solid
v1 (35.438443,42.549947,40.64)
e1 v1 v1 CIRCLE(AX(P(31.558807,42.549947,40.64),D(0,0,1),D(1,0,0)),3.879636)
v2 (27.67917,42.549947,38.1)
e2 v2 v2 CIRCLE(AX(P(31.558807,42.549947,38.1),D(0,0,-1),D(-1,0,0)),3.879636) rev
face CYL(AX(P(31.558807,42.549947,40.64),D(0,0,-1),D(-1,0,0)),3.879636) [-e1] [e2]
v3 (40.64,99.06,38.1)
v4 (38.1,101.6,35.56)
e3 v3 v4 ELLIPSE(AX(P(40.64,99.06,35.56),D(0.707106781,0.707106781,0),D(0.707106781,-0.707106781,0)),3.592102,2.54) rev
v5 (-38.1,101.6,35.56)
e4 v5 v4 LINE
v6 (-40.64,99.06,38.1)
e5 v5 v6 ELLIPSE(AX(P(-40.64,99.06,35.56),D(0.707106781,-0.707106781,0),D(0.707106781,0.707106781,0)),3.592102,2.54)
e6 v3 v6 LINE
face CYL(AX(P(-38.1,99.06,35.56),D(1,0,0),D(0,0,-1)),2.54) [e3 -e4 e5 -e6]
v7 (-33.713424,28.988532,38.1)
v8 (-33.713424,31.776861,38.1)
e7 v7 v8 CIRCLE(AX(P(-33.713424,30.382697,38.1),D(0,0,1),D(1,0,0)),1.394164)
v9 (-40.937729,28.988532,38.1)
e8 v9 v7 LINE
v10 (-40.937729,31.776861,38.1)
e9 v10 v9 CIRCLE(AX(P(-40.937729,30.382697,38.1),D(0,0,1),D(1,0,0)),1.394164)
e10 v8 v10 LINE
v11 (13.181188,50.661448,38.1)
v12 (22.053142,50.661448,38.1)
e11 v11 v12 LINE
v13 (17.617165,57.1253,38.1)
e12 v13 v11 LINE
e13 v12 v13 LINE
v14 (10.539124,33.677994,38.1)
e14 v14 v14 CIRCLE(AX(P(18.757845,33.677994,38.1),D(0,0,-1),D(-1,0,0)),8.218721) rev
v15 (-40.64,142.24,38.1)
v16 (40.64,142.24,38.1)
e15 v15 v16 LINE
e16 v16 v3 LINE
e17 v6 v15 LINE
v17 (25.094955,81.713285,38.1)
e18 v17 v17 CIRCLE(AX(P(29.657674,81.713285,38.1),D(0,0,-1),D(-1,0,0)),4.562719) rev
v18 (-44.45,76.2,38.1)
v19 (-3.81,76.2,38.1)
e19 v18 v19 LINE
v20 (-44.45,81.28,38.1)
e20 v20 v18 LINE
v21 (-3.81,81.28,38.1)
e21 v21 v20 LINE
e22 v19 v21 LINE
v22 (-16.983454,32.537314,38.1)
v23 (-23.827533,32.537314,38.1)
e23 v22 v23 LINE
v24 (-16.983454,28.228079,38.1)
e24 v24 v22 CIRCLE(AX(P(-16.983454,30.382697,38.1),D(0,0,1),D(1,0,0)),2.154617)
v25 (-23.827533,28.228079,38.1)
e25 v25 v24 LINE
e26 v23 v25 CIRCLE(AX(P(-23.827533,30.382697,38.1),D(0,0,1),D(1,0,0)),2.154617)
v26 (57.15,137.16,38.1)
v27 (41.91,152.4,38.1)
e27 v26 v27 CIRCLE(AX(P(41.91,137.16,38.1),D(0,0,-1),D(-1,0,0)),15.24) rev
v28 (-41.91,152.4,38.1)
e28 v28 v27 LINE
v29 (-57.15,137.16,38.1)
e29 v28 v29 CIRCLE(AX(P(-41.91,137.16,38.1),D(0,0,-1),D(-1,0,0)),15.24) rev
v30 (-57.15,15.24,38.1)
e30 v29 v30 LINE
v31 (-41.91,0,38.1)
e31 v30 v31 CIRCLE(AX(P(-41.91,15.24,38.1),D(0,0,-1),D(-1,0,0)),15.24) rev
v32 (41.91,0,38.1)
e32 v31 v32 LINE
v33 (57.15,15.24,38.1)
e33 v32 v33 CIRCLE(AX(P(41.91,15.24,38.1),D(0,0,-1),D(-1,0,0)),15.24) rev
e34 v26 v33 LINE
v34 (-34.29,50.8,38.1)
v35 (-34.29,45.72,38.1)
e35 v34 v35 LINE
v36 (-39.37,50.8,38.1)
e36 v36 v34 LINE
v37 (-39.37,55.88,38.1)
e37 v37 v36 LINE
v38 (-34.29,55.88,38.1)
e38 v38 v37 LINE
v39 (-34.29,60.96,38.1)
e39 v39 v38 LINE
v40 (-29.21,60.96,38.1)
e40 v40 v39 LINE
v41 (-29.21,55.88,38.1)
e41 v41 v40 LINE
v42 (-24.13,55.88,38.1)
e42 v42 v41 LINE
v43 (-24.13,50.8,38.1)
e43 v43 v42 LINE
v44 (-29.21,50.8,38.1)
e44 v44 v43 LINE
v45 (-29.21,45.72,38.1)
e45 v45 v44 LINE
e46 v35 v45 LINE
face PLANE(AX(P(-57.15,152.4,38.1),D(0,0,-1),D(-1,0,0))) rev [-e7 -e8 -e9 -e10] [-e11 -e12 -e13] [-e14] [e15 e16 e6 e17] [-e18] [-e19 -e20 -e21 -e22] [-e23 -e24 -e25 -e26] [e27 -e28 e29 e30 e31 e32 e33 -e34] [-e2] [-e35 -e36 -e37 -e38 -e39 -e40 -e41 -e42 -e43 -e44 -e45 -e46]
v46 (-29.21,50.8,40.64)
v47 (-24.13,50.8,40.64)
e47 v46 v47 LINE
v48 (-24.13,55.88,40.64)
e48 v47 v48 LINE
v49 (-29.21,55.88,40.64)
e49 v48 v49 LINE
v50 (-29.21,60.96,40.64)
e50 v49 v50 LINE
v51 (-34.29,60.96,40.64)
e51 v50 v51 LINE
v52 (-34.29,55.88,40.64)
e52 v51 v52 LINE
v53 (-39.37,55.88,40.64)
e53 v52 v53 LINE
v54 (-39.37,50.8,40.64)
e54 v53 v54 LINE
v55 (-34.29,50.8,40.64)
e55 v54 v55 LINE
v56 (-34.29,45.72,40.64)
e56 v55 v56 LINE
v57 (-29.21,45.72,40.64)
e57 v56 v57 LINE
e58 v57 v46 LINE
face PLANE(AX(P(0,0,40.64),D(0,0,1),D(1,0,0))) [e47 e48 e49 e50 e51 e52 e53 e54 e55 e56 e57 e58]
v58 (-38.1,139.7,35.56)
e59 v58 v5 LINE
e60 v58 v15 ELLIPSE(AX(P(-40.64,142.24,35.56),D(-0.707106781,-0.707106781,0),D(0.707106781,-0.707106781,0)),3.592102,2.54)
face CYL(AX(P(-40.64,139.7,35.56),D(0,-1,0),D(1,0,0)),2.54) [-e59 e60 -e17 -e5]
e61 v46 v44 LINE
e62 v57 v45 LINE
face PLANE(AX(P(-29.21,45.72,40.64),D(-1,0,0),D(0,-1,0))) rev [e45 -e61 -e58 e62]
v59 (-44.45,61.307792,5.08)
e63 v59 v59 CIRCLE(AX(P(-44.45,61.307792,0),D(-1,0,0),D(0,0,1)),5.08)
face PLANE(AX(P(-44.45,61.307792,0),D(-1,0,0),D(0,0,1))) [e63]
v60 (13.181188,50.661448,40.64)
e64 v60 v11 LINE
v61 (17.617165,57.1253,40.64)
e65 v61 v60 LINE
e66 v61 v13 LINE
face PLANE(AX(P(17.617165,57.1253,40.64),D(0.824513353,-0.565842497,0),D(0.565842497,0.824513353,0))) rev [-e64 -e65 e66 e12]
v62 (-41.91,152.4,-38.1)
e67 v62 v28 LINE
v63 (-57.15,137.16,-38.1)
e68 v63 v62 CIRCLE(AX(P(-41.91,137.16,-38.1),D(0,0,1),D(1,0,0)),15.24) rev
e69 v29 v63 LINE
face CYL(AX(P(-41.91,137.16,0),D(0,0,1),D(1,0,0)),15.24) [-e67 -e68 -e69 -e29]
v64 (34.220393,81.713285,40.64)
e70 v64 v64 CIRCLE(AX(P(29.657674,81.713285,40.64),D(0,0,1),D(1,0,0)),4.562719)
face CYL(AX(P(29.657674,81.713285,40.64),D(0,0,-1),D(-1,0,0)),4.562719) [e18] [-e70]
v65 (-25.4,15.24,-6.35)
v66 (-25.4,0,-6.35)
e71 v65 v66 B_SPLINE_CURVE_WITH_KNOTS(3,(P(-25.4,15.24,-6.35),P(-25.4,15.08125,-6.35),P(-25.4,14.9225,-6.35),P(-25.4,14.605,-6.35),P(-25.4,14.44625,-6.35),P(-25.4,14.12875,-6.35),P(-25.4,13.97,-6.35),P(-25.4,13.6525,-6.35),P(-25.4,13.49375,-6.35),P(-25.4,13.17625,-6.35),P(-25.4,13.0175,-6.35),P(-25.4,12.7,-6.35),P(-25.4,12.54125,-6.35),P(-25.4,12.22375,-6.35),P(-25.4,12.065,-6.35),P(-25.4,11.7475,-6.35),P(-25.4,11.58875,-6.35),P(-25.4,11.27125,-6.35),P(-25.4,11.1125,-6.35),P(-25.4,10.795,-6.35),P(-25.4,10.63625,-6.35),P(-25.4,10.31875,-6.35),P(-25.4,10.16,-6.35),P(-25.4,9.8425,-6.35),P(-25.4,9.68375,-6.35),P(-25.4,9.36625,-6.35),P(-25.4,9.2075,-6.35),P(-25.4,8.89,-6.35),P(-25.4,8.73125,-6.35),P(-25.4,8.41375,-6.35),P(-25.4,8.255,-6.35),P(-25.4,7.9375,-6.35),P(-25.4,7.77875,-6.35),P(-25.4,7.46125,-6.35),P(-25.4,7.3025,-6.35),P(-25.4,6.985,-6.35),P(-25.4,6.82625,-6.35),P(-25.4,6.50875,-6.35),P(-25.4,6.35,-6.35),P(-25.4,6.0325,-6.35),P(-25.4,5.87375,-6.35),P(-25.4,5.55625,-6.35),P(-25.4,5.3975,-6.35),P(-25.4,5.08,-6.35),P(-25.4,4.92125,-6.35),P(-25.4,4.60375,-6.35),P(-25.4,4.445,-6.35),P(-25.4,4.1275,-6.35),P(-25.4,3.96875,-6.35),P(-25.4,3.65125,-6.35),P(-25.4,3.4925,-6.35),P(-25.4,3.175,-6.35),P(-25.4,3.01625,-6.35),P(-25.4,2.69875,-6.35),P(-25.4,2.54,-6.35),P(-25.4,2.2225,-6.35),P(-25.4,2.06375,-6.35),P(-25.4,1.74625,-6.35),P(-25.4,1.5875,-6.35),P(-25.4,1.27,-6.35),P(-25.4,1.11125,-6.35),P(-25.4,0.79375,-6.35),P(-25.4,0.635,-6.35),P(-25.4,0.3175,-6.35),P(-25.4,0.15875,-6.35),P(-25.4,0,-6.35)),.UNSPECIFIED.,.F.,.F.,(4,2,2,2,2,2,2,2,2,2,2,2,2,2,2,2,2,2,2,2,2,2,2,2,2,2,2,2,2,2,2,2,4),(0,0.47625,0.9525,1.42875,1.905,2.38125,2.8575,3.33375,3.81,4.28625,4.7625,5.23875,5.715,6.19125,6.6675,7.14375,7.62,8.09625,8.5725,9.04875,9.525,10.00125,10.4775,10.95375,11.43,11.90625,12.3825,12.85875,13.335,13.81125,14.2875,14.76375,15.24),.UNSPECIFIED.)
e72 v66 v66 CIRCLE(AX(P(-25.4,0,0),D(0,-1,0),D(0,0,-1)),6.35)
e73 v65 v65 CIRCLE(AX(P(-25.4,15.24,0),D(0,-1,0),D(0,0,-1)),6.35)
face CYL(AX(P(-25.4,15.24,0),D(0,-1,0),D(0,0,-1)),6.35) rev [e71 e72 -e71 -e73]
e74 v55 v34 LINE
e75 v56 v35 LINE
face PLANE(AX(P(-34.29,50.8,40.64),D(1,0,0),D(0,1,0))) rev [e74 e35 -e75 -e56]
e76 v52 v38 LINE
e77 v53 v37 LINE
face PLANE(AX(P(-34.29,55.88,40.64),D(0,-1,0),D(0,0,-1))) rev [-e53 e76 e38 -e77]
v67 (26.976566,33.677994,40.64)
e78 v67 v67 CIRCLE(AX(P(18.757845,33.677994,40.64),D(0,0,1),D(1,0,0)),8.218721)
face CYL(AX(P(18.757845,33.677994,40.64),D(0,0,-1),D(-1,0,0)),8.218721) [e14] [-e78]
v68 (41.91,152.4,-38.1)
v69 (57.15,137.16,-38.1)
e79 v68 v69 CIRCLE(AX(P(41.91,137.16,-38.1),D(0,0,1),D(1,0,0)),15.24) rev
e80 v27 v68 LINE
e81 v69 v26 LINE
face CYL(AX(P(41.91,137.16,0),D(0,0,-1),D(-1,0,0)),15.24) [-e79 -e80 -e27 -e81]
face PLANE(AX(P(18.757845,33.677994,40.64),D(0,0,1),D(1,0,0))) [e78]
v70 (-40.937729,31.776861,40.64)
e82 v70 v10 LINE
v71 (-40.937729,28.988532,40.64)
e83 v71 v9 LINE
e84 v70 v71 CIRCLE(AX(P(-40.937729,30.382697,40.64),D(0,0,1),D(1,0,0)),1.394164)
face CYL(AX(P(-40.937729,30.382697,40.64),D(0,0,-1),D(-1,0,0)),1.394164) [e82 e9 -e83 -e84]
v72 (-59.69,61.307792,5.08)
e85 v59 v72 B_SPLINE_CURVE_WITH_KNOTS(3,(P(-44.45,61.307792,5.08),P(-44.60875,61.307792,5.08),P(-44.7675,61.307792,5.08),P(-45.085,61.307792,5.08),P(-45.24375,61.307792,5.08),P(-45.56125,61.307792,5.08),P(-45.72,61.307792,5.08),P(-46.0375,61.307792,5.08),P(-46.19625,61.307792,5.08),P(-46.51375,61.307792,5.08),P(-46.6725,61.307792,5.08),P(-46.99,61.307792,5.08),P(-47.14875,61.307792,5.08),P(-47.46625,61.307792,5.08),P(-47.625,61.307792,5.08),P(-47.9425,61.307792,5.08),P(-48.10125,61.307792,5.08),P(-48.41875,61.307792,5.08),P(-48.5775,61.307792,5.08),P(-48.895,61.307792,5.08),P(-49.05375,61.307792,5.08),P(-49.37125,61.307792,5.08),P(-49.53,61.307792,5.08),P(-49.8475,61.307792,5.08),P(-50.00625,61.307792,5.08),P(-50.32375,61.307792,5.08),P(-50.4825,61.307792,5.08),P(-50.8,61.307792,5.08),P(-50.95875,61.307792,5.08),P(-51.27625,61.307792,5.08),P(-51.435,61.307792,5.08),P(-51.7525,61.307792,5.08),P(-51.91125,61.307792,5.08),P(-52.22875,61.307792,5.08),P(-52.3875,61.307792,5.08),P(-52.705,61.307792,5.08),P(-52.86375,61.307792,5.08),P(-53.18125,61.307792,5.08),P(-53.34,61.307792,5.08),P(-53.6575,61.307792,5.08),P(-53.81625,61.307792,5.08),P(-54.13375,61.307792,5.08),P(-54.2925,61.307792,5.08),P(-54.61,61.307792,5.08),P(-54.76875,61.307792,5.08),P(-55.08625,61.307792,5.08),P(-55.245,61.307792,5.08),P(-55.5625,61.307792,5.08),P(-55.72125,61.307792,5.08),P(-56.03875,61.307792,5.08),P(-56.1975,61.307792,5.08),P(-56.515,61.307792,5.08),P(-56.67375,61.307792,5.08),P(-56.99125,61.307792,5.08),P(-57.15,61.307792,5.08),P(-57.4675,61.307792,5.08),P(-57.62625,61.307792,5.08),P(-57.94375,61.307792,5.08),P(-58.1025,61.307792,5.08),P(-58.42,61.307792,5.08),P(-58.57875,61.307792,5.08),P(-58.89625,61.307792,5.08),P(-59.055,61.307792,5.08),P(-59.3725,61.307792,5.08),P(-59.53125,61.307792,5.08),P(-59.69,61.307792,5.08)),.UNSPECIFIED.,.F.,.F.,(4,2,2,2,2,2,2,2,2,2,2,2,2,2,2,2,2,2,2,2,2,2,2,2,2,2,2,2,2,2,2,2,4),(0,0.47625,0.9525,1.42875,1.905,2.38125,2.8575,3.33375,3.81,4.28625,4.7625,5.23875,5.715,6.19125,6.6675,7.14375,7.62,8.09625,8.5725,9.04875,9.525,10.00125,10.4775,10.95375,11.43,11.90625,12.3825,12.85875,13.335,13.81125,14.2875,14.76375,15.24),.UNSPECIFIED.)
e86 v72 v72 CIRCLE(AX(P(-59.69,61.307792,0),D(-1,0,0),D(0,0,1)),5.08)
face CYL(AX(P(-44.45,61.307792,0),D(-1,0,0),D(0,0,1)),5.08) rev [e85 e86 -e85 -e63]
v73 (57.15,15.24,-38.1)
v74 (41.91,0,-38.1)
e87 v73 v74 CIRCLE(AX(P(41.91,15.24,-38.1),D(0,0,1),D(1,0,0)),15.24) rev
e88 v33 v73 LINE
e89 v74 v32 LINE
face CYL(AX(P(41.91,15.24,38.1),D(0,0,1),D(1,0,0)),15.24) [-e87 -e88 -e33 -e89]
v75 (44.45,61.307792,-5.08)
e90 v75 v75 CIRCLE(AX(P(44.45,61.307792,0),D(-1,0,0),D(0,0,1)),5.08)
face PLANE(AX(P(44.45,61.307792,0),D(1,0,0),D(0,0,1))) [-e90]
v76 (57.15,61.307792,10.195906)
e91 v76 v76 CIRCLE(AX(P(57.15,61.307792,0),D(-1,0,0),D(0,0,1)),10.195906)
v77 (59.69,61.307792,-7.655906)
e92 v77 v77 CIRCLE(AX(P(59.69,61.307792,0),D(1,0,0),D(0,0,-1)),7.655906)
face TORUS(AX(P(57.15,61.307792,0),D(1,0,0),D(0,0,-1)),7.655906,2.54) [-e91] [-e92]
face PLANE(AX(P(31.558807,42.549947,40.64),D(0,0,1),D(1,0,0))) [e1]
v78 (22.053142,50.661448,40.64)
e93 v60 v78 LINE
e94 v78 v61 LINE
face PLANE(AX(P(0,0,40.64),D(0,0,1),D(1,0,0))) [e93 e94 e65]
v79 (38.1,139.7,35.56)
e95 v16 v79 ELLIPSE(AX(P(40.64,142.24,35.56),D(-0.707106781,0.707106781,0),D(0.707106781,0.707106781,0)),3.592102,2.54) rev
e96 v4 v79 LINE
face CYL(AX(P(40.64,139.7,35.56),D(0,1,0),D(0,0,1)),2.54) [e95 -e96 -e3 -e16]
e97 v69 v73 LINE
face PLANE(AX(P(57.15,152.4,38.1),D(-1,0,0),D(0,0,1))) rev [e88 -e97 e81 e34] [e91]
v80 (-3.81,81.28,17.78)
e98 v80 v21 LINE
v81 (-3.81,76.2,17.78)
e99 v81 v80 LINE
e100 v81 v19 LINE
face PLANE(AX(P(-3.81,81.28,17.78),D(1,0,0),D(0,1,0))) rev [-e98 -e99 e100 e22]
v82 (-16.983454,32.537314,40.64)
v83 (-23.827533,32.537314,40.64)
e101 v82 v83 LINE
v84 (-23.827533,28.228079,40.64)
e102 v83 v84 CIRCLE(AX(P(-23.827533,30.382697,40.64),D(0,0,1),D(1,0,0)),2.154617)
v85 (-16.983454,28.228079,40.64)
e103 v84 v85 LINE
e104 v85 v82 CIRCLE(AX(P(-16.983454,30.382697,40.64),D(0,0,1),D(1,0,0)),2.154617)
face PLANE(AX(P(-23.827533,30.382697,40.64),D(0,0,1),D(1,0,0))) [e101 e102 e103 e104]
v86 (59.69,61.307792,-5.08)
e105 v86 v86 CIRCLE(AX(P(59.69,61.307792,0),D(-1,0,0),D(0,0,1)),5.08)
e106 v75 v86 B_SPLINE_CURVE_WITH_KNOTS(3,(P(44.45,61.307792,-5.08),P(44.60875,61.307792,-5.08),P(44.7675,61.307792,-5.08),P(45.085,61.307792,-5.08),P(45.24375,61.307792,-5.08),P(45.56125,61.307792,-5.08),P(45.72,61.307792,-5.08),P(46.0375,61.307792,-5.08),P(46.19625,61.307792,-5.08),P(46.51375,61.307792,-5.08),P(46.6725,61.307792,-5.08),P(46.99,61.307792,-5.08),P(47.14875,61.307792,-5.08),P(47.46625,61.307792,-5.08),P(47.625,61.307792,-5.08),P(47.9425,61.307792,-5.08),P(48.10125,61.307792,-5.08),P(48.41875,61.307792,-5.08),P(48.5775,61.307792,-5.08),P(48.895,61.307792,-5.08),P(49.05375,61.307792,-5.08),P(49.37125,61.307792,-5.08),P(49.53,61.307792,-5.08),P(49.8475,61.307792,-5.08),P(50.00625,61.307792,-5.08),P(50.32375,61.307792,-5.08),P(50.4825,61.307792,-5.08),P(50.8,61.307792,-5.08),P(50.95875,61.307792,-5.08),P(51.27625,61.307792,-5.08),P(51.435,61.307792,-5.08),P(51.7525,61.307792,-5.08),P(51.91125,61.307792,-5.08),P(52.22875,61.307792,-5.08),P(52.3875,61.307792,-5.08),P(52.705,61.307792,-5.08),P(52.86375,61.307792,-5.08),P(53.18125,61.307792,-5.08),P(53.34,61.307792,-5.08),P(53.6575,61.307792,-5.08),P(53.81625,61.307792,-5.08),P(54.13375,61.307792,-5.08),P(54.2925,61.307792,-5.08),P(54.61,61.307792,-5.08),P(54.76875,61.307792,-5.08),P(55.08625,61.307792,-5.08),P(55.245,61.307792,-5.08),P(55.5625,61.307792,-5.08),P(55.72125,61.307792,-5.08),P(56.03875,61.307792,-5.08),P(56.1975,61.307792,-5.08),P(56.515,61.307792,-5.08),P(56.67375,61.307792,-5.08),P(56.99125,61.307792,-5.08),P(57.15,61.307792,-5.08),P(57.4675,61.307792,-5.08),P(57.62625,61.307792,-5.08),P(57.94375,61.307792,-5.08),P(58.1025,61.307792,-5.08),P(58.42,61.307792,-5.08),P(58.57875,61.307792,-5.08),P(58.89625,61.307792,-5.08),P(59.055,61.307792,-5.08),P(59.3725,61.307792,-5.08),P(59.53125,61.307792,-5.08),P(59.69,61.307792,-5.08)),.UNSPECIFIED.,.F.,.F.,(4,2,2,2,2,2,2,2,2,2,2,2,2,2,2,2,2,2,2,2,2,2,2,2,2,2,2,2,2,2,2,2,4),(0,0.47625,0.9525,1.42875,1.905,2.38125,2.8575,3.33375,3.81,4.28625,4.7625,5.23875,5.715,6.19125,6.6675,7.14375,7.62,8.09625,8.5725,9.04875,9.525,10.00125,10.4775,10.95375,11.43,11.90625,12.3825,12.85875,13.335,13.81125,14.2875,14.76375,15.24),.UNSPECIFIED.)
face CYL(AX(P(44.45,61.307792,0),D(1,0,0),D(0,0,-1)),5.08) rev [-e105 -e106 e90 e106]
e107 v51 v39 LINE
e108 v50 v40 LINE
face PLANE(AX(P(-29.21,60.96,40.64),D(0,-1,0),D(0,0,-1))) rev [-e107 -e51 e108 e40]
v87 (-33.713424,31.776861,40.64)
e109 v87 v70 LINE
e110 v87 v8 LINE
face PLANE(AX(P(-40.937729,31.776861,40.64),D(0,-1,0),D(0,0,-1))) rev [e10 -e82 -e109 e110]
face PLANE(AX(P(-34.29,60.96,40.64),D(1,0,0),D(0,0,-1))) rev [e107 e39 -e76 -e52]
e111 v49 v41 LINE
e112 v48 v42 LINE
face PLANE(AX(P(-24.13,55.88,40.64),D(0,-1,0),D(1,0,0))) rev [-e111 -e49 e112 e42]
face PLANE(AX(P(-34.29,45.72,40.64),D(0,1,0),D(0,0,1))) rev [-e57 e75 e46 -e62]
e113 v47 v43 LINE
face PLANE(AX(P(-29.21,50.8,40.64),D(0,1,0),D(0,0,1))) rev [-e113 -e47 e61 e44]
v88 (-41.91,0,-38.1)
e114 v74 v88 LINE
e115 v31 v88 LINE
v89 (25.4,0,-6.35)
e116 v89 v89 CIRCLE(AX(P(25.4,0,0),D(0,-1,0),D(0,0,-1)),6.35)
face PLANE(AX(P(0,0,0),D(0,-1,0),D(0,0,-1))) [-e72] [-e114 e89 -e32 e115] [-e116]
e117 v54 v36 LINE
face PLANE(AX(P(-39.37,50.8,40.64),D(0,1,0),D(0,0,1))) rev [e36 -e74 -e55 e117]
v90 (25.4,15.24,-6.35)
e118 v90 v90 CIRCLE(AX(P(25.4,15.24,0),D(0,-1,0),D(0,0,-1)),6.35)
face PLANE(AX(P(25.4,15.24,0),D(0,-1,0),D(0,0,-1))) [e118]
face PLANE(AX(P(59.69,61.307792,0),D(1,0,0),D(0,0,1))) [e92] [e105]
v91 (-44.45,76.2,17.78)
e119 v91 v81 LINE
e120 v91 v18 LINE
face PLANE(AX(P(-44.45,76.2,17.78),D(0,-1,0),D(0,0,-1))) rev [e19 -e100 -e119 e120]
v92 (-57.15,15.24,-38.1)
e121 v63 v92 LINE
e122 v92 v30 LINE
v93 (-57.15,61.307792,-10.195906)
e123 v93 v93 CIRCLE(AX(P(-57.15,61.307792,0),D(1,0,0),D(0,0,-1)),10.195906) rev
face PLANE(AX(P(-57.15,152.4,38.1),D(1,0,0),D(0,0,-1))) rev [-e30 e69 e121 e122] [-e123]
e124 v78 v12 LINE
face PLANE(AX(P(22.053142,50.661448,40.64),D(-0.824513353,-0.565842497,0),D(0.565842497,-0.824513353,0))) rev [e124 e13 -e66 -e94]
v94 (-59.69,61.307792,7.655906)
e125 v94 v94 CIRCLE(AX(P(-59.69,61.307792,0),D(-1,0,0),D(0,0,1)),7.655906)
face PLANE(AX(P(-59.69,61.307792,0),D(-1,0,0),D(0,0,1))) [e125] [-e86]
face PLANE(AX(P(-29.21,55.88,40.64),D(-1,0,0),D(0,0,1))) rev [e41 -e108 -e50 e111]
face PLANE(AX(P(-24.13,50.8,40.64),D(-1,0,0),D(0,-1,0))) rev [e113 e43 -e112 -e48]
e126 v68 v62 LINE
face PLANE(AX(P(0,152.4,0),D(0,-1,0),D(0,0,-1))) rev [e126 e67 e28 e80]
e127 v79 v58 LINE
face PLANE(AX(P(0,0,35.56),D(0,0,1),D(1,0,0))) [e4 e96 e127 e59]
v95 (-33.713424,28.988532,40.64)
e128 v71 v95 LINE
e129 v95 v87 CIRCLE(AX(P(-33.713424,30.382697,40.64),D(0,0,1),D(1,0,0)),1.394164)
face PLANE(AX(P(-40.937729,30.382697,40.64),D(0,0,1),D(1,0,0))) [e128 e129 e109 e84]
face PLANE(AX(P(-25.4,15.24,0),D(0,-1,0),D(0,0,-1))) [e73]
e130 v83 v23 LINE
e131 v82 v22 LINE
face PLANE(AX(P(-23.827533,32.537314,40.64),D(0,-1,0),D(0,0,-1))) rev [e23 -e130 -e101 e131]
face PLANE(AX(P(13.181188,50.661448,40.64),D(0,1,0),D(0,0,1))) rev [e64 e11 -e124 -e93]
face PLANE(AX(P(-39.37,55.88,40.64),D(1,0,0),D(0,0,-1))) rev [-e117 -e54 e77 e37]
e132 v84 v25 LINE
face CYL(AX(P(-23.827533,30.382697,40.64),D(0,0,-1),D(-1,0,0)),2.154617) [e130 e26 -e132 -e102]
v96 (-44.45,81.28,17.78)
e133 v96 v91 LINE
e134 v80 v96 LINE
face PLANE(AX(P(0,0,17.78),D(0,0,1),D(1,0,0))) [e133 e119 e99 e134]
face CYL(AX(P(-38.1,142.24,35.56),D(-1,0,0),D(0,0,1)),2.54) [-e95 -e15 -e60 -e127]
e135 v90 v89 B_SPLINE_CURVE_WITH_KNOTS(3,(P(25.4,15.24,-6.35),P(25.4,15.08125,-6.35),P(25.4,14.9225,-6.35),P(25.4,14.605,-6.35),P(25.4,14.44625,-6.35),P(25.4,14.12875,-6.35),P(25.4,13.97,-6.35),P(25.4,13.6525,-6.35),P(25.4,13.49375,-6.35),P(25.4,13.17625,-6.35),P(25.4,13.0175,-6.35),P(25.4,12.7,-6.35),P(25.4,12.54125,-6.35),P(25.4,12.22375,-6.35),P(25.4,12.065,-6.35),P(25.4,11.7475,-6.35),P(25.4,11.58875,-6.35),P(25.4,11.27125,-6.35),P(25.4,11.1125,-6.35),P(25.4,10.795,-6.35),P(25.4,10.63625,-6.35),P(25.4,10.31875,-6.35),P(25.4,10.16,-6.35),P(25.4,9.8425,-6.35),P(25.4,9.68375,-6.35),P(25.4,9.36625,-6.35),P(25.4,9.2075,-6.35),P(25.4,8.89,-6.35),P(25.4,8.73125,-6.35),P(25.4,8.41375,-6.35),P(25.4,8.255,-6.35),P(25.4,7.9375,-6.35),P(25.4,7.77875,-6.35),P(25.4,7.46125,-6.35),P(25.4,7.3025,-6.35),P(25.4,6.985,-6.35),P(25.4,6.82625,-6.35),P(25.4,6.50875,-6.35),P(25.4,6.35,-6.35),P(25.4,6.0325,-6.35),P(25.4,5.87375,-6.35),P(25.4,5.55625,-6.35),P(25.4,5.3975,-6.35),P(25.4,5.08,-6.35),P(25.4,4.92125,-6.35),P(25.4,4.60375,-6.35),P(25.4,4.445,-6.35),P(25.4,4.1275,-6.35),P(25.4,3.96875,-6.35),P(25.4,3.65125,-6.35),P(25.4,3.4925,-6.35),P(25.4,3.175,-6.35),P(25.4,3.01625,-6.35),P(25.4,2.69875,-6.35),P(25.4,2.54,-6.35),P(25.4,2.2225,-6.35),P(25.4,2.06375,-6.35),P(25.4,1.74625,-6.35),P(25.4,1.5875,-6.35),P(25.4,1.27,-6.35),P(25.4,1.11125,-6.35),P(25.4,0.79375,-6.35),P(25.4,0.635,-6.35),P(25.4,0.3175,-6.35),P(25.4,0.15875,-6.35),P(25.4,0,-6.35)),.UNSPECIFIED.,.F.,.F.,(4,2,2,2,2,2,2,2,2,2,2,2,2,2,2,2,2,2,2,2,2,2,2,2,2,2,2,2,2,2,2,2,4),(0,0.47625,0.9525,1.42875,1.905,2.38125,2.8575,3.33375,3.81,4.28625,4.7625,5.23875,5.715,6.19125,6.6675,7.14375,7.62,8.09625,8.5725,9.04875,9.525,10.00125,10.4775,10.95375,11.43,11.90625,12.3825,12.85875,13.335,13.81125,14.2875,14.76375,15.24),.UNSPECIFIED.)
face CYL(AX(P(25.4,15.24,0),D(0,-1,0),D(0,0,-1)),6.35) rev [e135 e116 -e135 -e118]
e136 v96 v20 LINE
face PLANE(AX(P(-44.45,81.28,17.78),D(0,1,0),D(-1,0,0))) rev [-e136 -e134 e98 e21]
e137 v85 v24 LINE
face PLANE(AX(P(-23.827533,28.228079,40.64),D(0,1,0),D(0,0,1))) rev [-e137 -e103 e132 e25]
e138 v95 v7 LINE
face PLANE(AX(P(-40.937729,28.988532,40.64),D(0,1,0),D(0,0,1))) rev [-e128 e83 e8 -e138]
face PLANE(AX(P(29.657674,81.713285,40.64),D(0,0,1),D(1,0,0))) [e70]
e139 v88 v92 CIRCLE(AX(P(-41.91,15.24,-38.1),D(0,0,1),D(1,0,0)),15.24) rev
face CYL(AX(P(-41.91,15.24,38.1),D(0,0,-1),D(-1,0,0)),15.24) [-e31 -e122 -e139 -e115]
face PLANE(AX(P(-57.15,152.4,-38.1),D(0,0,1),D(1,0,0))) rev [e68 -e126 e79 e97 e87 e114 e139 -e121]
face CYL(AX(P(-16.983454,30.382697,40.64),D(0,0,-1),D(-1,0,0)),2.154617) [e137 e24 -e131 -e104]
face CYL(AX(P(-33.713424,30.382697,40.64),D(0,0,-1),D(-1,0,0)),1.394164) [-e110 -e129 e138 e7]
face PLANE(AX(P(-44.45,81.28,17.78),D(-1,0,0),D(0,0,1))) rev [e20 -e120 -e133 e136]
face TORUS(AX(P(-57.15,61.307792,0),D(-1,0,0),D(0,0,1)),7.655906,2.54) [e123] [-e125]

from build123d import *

# Parameters (mm, degrees)
SKETCH2_W           = 114.3
SKETCH2_H           = 76.2
BOSS_EXTRUDE1_DEPTH = 152.4
SKETCH3_W           = 76.2
SKETCH3_H           = 38.1
CUT_EXTRUDE1_DEPTH  = 2.54
FILLET2_R           = 15.24
SKETCH4_W           = 40.64
SKETCH4_H           = 5.08
CUT_EXTRUDE2_DEPTH  = 20.32
SKETCH5_R           = 4.562719015
BOSS_EXTRUDE2_DEPTH = 2.54
SKETCH11_R          = 10.195906114
BOSS_EXTRUDE3_DEPTH = 2.54
SKETCH12_R          = 5.08
CUT_EXTRUDE8_DEPTH  = 15.24
SKETCH13_R          = 6.35
CUT_EXTRUDE9_DEPTH  = 15.24
FILLET3_R           = 2.54
FILLET4_R           = 2.54
BOSS_EXTRUDE4_DEPTH = 2.54
BOSS_EXTRUDE5_DEPTH = 2.54
SKETCH8_R           = 3.879636345
BOSS_EXTRUDE6_DEPTH = 2.54
BOSS_EXTRUDE7_DEPTH = 2.54
SKETCH9_R           = 8.218720736
BOSS_EXTRUDE8_DEPTH = 2.54


with BuildPart() as part:
    # Sketch2 → Boss-Extrude1 (new body)
    with BuildSketch(Plane(origin=(0, 0, 0), x_dir=(1, 0, 0), z_dir=(0, 1, 0))):
        Rectangle(SKETCH2_W, SKETCH2_H)
    extrude(amount=BOSS_EXTRUDE1_DEPTH)

    # Sketch3 → Cut-Extrude1 (cut)
    with BuildSketch(Plane.XY.offset(38.1)):
        with Locations((0, 120.65)):
            Rectangle(SKETCH3_W, SKETCH3_H)
    extrude(amount=-CUT_EXTRUDE1_DEPTH, mode=Mode.SUBTRACT)

    # Fillet2
    fillet2_edges = [part.edges().sort_by_distance(p)[0] for p in [
        (-57.15, 152.4, 0),
        (57.15, 152.4, 0),
        (-57.15, 0, 0),
        (57.15, 0, 0),
    ]]
    fillet(fillet2_edges, radius=FILLET2_R)

    # Sketch4 → Cut-Extrude2 (cut)
    with BuildSketch(Plane.XY.offset(38.1)):
        with Locations((-24.13, 78.74)):
            Rectangle(SKETCH4_W, SKETCH4_H)
    extrude(amount=-CUT_EXTRUDE2_DEPTH, mode=Mode.SUBTRACT)

    # Sketch5 → Boss-Extrude2 (add)
    with BuildSketch(Plane.XY.offset(38.1)):
        with Locations(Location((29.657673596, 81.713285476, 0), (0, 0, 180))):
            Circle(SKETCH5_R)
    extrude(amount=BOSS_EXTRUDE2_DEPTH)

    # Sketch11 → Boss-Extrude3 (add)
    with BuildSketch(Plane.ZY.offset(57.15)):
        with Locations(Location((0, 61.307792105, 0), (0, 0, 180))):
            Circle(SKETCH11_R)
    boss_extrude3 = extrude(amount=BOSS_EXTRUDE3_DEPTH)

    # Sketch12 → Cut-Extrude8 (cut)
    with BuildSketch(Plane.ZY.offset(59.69)):
        with Locations((0, 61.307792105)):
            Circle(SKETCH12_R)
    cut_extrude8 = extrude(amount=-CUT_EXTRUDE8_DEPTH, mode=Mode.SUBTRACT)

    # Mirror1: Boss-Extrude3, Cut-Extrude8 across plane
    add(boss_extrude3.mirror(Plane(origin=(0, 0, 0), x_dir=(0, 0, 1), z_dir=(1, 0, 0))))
    add(cut_extrude8.mirror(Plane(origin=(0, 0, 0), x_dir=(0, 0, 1), z_dir=(1, 0, 0))), mode=Mode.SUBTRACT)

    # Sketch13 → Cut-Extrude9 (cut)
    with BuildSketch(Plane.XZ):
        with Locations(Location((-25.4, 0, 0), (0, 0, 270))):
            Circle(SKETCH13_R)
        with Locations(Location((25.4, 0, 0), (0, 0, 270))):
            Circle(SKETCH13_R)
    extrude(amount=-CUT_EXTRUDE9_DEPTH, mode=Mode.SUBTRACT)

    # Fillet3
    fillet3_edges = [part.edges().sort_by_distance(p)[0] for p in [
        (-59.69, 61.307792105, 10.195906114),
        (59.69, 61.307792105, 10.195906114),
    ]]
    fillet(fillet3_edges, radius=FILLET3_R - 0.0001)  # a hair under: the kernel refuses the full size

    # Fillet4
    fillet4_edges = [part.edges().sort_by_distance(p)[0] for p in [
        (0, 101.6, 38.1),
        (-38.1, 120.65, 38.1),
        (38.1, 120.65, 38.1),
        (0, 139.7, 38.1),
    ]]
    fillet(fillet4_edges, radius=FILLET4_R - 0.0001)  # a hair under: the kernel refuses the full size

    # Sketch6 → Boss-Extrude4 (add)
    with BuildSketch(Plane.XY.offset(38.1)):
        Polygon((-34.29, 60.96), (-34.29, 55.88), (-39.37, 55.88), (-39.37, 50.8), (-34.29, 50.8), (-34.29, 45.72), (-29.21, 45.72), (-29.21, 50.8), (-24.13, 50.8), (-24.13, 55.88), (-29.21, 55.88), (-29.21, 60.96), align=None)
    extrude(amount=BOSS_EXTRUDE4_DEPTH)

    # Sketch7 → Boss-Extrude5 (add)
    with BuildSketch(Plane.XY.offset(38.1)):
        Polygon((17.617165085, 57.125299675), (13.181188265, 50.661447737), (22.053141905, 50.661447737), align=None)
    extrude(amount=BOSS_EXTRUDE5_DEPTH)

    # Sketch8 → Boss-Extrude6 (add)
    with BuildSketch(Plane.XY.offset(38.1)):
        with Locations(Location((31.558806519, 42.549947266, 0), (0, 0, 180))):
            Circle(SKETCH8_R)
    extrude(amount=BOSS_EXTRUDE6_DEPTH)

    # Sketch10 → Boss-Extrude7 (add)
    with BuildSketch(Plane.XY.offset(38.1)):
        with BuildLine():
            Line((-40.937728938, 31.776860704), (-33.713423831, 31.776860704))
            ThreePointArc((-33.713423831, 31.776860704), (-32.319259688, 30.38269656), (-33.713423831, 28.988532417))
            Line((-33.713423831, 28.988532417), (-40.937728938, 28.988532417))
            ThreePointArc((-40.937728938, 28.988532417), (-42.331893081, 30.38269656), (-40.937728938, 31.776860704))
        make_face()
        with BuildLine():
            Line((-23.827532632, 32.537313873), (-16.98345411, 32.537313873))
            ThreePointArc((-16.98345411, 32.537313873), (-14.828836798, 30.38269656), (-16.98345411, 28.228079248))
            Line((-16.98345411, 28.228079248), (-23.827532632, 28.228079248))
            ThreePointArc((-23.827532632, 28.228079248), (-25.982149945, 30.38269656), (-23.827532632, 32.537313873))
        make_face()
    extrude(amount=BOSS_EXTRUDE7_DEPTH)

    # Sketch9 → Boss-Extrude8 (add)
    with BuildSketch(Plane.XY.offset(38.1)):
        with Locations(Location((18.757844838, 33.677993627, 0), (0, 0, 180))):
            Circle(SKETCH9_R)
    extrude(amount=BOSS_EXTRUDE8_DEPTH)


solid = part.part
